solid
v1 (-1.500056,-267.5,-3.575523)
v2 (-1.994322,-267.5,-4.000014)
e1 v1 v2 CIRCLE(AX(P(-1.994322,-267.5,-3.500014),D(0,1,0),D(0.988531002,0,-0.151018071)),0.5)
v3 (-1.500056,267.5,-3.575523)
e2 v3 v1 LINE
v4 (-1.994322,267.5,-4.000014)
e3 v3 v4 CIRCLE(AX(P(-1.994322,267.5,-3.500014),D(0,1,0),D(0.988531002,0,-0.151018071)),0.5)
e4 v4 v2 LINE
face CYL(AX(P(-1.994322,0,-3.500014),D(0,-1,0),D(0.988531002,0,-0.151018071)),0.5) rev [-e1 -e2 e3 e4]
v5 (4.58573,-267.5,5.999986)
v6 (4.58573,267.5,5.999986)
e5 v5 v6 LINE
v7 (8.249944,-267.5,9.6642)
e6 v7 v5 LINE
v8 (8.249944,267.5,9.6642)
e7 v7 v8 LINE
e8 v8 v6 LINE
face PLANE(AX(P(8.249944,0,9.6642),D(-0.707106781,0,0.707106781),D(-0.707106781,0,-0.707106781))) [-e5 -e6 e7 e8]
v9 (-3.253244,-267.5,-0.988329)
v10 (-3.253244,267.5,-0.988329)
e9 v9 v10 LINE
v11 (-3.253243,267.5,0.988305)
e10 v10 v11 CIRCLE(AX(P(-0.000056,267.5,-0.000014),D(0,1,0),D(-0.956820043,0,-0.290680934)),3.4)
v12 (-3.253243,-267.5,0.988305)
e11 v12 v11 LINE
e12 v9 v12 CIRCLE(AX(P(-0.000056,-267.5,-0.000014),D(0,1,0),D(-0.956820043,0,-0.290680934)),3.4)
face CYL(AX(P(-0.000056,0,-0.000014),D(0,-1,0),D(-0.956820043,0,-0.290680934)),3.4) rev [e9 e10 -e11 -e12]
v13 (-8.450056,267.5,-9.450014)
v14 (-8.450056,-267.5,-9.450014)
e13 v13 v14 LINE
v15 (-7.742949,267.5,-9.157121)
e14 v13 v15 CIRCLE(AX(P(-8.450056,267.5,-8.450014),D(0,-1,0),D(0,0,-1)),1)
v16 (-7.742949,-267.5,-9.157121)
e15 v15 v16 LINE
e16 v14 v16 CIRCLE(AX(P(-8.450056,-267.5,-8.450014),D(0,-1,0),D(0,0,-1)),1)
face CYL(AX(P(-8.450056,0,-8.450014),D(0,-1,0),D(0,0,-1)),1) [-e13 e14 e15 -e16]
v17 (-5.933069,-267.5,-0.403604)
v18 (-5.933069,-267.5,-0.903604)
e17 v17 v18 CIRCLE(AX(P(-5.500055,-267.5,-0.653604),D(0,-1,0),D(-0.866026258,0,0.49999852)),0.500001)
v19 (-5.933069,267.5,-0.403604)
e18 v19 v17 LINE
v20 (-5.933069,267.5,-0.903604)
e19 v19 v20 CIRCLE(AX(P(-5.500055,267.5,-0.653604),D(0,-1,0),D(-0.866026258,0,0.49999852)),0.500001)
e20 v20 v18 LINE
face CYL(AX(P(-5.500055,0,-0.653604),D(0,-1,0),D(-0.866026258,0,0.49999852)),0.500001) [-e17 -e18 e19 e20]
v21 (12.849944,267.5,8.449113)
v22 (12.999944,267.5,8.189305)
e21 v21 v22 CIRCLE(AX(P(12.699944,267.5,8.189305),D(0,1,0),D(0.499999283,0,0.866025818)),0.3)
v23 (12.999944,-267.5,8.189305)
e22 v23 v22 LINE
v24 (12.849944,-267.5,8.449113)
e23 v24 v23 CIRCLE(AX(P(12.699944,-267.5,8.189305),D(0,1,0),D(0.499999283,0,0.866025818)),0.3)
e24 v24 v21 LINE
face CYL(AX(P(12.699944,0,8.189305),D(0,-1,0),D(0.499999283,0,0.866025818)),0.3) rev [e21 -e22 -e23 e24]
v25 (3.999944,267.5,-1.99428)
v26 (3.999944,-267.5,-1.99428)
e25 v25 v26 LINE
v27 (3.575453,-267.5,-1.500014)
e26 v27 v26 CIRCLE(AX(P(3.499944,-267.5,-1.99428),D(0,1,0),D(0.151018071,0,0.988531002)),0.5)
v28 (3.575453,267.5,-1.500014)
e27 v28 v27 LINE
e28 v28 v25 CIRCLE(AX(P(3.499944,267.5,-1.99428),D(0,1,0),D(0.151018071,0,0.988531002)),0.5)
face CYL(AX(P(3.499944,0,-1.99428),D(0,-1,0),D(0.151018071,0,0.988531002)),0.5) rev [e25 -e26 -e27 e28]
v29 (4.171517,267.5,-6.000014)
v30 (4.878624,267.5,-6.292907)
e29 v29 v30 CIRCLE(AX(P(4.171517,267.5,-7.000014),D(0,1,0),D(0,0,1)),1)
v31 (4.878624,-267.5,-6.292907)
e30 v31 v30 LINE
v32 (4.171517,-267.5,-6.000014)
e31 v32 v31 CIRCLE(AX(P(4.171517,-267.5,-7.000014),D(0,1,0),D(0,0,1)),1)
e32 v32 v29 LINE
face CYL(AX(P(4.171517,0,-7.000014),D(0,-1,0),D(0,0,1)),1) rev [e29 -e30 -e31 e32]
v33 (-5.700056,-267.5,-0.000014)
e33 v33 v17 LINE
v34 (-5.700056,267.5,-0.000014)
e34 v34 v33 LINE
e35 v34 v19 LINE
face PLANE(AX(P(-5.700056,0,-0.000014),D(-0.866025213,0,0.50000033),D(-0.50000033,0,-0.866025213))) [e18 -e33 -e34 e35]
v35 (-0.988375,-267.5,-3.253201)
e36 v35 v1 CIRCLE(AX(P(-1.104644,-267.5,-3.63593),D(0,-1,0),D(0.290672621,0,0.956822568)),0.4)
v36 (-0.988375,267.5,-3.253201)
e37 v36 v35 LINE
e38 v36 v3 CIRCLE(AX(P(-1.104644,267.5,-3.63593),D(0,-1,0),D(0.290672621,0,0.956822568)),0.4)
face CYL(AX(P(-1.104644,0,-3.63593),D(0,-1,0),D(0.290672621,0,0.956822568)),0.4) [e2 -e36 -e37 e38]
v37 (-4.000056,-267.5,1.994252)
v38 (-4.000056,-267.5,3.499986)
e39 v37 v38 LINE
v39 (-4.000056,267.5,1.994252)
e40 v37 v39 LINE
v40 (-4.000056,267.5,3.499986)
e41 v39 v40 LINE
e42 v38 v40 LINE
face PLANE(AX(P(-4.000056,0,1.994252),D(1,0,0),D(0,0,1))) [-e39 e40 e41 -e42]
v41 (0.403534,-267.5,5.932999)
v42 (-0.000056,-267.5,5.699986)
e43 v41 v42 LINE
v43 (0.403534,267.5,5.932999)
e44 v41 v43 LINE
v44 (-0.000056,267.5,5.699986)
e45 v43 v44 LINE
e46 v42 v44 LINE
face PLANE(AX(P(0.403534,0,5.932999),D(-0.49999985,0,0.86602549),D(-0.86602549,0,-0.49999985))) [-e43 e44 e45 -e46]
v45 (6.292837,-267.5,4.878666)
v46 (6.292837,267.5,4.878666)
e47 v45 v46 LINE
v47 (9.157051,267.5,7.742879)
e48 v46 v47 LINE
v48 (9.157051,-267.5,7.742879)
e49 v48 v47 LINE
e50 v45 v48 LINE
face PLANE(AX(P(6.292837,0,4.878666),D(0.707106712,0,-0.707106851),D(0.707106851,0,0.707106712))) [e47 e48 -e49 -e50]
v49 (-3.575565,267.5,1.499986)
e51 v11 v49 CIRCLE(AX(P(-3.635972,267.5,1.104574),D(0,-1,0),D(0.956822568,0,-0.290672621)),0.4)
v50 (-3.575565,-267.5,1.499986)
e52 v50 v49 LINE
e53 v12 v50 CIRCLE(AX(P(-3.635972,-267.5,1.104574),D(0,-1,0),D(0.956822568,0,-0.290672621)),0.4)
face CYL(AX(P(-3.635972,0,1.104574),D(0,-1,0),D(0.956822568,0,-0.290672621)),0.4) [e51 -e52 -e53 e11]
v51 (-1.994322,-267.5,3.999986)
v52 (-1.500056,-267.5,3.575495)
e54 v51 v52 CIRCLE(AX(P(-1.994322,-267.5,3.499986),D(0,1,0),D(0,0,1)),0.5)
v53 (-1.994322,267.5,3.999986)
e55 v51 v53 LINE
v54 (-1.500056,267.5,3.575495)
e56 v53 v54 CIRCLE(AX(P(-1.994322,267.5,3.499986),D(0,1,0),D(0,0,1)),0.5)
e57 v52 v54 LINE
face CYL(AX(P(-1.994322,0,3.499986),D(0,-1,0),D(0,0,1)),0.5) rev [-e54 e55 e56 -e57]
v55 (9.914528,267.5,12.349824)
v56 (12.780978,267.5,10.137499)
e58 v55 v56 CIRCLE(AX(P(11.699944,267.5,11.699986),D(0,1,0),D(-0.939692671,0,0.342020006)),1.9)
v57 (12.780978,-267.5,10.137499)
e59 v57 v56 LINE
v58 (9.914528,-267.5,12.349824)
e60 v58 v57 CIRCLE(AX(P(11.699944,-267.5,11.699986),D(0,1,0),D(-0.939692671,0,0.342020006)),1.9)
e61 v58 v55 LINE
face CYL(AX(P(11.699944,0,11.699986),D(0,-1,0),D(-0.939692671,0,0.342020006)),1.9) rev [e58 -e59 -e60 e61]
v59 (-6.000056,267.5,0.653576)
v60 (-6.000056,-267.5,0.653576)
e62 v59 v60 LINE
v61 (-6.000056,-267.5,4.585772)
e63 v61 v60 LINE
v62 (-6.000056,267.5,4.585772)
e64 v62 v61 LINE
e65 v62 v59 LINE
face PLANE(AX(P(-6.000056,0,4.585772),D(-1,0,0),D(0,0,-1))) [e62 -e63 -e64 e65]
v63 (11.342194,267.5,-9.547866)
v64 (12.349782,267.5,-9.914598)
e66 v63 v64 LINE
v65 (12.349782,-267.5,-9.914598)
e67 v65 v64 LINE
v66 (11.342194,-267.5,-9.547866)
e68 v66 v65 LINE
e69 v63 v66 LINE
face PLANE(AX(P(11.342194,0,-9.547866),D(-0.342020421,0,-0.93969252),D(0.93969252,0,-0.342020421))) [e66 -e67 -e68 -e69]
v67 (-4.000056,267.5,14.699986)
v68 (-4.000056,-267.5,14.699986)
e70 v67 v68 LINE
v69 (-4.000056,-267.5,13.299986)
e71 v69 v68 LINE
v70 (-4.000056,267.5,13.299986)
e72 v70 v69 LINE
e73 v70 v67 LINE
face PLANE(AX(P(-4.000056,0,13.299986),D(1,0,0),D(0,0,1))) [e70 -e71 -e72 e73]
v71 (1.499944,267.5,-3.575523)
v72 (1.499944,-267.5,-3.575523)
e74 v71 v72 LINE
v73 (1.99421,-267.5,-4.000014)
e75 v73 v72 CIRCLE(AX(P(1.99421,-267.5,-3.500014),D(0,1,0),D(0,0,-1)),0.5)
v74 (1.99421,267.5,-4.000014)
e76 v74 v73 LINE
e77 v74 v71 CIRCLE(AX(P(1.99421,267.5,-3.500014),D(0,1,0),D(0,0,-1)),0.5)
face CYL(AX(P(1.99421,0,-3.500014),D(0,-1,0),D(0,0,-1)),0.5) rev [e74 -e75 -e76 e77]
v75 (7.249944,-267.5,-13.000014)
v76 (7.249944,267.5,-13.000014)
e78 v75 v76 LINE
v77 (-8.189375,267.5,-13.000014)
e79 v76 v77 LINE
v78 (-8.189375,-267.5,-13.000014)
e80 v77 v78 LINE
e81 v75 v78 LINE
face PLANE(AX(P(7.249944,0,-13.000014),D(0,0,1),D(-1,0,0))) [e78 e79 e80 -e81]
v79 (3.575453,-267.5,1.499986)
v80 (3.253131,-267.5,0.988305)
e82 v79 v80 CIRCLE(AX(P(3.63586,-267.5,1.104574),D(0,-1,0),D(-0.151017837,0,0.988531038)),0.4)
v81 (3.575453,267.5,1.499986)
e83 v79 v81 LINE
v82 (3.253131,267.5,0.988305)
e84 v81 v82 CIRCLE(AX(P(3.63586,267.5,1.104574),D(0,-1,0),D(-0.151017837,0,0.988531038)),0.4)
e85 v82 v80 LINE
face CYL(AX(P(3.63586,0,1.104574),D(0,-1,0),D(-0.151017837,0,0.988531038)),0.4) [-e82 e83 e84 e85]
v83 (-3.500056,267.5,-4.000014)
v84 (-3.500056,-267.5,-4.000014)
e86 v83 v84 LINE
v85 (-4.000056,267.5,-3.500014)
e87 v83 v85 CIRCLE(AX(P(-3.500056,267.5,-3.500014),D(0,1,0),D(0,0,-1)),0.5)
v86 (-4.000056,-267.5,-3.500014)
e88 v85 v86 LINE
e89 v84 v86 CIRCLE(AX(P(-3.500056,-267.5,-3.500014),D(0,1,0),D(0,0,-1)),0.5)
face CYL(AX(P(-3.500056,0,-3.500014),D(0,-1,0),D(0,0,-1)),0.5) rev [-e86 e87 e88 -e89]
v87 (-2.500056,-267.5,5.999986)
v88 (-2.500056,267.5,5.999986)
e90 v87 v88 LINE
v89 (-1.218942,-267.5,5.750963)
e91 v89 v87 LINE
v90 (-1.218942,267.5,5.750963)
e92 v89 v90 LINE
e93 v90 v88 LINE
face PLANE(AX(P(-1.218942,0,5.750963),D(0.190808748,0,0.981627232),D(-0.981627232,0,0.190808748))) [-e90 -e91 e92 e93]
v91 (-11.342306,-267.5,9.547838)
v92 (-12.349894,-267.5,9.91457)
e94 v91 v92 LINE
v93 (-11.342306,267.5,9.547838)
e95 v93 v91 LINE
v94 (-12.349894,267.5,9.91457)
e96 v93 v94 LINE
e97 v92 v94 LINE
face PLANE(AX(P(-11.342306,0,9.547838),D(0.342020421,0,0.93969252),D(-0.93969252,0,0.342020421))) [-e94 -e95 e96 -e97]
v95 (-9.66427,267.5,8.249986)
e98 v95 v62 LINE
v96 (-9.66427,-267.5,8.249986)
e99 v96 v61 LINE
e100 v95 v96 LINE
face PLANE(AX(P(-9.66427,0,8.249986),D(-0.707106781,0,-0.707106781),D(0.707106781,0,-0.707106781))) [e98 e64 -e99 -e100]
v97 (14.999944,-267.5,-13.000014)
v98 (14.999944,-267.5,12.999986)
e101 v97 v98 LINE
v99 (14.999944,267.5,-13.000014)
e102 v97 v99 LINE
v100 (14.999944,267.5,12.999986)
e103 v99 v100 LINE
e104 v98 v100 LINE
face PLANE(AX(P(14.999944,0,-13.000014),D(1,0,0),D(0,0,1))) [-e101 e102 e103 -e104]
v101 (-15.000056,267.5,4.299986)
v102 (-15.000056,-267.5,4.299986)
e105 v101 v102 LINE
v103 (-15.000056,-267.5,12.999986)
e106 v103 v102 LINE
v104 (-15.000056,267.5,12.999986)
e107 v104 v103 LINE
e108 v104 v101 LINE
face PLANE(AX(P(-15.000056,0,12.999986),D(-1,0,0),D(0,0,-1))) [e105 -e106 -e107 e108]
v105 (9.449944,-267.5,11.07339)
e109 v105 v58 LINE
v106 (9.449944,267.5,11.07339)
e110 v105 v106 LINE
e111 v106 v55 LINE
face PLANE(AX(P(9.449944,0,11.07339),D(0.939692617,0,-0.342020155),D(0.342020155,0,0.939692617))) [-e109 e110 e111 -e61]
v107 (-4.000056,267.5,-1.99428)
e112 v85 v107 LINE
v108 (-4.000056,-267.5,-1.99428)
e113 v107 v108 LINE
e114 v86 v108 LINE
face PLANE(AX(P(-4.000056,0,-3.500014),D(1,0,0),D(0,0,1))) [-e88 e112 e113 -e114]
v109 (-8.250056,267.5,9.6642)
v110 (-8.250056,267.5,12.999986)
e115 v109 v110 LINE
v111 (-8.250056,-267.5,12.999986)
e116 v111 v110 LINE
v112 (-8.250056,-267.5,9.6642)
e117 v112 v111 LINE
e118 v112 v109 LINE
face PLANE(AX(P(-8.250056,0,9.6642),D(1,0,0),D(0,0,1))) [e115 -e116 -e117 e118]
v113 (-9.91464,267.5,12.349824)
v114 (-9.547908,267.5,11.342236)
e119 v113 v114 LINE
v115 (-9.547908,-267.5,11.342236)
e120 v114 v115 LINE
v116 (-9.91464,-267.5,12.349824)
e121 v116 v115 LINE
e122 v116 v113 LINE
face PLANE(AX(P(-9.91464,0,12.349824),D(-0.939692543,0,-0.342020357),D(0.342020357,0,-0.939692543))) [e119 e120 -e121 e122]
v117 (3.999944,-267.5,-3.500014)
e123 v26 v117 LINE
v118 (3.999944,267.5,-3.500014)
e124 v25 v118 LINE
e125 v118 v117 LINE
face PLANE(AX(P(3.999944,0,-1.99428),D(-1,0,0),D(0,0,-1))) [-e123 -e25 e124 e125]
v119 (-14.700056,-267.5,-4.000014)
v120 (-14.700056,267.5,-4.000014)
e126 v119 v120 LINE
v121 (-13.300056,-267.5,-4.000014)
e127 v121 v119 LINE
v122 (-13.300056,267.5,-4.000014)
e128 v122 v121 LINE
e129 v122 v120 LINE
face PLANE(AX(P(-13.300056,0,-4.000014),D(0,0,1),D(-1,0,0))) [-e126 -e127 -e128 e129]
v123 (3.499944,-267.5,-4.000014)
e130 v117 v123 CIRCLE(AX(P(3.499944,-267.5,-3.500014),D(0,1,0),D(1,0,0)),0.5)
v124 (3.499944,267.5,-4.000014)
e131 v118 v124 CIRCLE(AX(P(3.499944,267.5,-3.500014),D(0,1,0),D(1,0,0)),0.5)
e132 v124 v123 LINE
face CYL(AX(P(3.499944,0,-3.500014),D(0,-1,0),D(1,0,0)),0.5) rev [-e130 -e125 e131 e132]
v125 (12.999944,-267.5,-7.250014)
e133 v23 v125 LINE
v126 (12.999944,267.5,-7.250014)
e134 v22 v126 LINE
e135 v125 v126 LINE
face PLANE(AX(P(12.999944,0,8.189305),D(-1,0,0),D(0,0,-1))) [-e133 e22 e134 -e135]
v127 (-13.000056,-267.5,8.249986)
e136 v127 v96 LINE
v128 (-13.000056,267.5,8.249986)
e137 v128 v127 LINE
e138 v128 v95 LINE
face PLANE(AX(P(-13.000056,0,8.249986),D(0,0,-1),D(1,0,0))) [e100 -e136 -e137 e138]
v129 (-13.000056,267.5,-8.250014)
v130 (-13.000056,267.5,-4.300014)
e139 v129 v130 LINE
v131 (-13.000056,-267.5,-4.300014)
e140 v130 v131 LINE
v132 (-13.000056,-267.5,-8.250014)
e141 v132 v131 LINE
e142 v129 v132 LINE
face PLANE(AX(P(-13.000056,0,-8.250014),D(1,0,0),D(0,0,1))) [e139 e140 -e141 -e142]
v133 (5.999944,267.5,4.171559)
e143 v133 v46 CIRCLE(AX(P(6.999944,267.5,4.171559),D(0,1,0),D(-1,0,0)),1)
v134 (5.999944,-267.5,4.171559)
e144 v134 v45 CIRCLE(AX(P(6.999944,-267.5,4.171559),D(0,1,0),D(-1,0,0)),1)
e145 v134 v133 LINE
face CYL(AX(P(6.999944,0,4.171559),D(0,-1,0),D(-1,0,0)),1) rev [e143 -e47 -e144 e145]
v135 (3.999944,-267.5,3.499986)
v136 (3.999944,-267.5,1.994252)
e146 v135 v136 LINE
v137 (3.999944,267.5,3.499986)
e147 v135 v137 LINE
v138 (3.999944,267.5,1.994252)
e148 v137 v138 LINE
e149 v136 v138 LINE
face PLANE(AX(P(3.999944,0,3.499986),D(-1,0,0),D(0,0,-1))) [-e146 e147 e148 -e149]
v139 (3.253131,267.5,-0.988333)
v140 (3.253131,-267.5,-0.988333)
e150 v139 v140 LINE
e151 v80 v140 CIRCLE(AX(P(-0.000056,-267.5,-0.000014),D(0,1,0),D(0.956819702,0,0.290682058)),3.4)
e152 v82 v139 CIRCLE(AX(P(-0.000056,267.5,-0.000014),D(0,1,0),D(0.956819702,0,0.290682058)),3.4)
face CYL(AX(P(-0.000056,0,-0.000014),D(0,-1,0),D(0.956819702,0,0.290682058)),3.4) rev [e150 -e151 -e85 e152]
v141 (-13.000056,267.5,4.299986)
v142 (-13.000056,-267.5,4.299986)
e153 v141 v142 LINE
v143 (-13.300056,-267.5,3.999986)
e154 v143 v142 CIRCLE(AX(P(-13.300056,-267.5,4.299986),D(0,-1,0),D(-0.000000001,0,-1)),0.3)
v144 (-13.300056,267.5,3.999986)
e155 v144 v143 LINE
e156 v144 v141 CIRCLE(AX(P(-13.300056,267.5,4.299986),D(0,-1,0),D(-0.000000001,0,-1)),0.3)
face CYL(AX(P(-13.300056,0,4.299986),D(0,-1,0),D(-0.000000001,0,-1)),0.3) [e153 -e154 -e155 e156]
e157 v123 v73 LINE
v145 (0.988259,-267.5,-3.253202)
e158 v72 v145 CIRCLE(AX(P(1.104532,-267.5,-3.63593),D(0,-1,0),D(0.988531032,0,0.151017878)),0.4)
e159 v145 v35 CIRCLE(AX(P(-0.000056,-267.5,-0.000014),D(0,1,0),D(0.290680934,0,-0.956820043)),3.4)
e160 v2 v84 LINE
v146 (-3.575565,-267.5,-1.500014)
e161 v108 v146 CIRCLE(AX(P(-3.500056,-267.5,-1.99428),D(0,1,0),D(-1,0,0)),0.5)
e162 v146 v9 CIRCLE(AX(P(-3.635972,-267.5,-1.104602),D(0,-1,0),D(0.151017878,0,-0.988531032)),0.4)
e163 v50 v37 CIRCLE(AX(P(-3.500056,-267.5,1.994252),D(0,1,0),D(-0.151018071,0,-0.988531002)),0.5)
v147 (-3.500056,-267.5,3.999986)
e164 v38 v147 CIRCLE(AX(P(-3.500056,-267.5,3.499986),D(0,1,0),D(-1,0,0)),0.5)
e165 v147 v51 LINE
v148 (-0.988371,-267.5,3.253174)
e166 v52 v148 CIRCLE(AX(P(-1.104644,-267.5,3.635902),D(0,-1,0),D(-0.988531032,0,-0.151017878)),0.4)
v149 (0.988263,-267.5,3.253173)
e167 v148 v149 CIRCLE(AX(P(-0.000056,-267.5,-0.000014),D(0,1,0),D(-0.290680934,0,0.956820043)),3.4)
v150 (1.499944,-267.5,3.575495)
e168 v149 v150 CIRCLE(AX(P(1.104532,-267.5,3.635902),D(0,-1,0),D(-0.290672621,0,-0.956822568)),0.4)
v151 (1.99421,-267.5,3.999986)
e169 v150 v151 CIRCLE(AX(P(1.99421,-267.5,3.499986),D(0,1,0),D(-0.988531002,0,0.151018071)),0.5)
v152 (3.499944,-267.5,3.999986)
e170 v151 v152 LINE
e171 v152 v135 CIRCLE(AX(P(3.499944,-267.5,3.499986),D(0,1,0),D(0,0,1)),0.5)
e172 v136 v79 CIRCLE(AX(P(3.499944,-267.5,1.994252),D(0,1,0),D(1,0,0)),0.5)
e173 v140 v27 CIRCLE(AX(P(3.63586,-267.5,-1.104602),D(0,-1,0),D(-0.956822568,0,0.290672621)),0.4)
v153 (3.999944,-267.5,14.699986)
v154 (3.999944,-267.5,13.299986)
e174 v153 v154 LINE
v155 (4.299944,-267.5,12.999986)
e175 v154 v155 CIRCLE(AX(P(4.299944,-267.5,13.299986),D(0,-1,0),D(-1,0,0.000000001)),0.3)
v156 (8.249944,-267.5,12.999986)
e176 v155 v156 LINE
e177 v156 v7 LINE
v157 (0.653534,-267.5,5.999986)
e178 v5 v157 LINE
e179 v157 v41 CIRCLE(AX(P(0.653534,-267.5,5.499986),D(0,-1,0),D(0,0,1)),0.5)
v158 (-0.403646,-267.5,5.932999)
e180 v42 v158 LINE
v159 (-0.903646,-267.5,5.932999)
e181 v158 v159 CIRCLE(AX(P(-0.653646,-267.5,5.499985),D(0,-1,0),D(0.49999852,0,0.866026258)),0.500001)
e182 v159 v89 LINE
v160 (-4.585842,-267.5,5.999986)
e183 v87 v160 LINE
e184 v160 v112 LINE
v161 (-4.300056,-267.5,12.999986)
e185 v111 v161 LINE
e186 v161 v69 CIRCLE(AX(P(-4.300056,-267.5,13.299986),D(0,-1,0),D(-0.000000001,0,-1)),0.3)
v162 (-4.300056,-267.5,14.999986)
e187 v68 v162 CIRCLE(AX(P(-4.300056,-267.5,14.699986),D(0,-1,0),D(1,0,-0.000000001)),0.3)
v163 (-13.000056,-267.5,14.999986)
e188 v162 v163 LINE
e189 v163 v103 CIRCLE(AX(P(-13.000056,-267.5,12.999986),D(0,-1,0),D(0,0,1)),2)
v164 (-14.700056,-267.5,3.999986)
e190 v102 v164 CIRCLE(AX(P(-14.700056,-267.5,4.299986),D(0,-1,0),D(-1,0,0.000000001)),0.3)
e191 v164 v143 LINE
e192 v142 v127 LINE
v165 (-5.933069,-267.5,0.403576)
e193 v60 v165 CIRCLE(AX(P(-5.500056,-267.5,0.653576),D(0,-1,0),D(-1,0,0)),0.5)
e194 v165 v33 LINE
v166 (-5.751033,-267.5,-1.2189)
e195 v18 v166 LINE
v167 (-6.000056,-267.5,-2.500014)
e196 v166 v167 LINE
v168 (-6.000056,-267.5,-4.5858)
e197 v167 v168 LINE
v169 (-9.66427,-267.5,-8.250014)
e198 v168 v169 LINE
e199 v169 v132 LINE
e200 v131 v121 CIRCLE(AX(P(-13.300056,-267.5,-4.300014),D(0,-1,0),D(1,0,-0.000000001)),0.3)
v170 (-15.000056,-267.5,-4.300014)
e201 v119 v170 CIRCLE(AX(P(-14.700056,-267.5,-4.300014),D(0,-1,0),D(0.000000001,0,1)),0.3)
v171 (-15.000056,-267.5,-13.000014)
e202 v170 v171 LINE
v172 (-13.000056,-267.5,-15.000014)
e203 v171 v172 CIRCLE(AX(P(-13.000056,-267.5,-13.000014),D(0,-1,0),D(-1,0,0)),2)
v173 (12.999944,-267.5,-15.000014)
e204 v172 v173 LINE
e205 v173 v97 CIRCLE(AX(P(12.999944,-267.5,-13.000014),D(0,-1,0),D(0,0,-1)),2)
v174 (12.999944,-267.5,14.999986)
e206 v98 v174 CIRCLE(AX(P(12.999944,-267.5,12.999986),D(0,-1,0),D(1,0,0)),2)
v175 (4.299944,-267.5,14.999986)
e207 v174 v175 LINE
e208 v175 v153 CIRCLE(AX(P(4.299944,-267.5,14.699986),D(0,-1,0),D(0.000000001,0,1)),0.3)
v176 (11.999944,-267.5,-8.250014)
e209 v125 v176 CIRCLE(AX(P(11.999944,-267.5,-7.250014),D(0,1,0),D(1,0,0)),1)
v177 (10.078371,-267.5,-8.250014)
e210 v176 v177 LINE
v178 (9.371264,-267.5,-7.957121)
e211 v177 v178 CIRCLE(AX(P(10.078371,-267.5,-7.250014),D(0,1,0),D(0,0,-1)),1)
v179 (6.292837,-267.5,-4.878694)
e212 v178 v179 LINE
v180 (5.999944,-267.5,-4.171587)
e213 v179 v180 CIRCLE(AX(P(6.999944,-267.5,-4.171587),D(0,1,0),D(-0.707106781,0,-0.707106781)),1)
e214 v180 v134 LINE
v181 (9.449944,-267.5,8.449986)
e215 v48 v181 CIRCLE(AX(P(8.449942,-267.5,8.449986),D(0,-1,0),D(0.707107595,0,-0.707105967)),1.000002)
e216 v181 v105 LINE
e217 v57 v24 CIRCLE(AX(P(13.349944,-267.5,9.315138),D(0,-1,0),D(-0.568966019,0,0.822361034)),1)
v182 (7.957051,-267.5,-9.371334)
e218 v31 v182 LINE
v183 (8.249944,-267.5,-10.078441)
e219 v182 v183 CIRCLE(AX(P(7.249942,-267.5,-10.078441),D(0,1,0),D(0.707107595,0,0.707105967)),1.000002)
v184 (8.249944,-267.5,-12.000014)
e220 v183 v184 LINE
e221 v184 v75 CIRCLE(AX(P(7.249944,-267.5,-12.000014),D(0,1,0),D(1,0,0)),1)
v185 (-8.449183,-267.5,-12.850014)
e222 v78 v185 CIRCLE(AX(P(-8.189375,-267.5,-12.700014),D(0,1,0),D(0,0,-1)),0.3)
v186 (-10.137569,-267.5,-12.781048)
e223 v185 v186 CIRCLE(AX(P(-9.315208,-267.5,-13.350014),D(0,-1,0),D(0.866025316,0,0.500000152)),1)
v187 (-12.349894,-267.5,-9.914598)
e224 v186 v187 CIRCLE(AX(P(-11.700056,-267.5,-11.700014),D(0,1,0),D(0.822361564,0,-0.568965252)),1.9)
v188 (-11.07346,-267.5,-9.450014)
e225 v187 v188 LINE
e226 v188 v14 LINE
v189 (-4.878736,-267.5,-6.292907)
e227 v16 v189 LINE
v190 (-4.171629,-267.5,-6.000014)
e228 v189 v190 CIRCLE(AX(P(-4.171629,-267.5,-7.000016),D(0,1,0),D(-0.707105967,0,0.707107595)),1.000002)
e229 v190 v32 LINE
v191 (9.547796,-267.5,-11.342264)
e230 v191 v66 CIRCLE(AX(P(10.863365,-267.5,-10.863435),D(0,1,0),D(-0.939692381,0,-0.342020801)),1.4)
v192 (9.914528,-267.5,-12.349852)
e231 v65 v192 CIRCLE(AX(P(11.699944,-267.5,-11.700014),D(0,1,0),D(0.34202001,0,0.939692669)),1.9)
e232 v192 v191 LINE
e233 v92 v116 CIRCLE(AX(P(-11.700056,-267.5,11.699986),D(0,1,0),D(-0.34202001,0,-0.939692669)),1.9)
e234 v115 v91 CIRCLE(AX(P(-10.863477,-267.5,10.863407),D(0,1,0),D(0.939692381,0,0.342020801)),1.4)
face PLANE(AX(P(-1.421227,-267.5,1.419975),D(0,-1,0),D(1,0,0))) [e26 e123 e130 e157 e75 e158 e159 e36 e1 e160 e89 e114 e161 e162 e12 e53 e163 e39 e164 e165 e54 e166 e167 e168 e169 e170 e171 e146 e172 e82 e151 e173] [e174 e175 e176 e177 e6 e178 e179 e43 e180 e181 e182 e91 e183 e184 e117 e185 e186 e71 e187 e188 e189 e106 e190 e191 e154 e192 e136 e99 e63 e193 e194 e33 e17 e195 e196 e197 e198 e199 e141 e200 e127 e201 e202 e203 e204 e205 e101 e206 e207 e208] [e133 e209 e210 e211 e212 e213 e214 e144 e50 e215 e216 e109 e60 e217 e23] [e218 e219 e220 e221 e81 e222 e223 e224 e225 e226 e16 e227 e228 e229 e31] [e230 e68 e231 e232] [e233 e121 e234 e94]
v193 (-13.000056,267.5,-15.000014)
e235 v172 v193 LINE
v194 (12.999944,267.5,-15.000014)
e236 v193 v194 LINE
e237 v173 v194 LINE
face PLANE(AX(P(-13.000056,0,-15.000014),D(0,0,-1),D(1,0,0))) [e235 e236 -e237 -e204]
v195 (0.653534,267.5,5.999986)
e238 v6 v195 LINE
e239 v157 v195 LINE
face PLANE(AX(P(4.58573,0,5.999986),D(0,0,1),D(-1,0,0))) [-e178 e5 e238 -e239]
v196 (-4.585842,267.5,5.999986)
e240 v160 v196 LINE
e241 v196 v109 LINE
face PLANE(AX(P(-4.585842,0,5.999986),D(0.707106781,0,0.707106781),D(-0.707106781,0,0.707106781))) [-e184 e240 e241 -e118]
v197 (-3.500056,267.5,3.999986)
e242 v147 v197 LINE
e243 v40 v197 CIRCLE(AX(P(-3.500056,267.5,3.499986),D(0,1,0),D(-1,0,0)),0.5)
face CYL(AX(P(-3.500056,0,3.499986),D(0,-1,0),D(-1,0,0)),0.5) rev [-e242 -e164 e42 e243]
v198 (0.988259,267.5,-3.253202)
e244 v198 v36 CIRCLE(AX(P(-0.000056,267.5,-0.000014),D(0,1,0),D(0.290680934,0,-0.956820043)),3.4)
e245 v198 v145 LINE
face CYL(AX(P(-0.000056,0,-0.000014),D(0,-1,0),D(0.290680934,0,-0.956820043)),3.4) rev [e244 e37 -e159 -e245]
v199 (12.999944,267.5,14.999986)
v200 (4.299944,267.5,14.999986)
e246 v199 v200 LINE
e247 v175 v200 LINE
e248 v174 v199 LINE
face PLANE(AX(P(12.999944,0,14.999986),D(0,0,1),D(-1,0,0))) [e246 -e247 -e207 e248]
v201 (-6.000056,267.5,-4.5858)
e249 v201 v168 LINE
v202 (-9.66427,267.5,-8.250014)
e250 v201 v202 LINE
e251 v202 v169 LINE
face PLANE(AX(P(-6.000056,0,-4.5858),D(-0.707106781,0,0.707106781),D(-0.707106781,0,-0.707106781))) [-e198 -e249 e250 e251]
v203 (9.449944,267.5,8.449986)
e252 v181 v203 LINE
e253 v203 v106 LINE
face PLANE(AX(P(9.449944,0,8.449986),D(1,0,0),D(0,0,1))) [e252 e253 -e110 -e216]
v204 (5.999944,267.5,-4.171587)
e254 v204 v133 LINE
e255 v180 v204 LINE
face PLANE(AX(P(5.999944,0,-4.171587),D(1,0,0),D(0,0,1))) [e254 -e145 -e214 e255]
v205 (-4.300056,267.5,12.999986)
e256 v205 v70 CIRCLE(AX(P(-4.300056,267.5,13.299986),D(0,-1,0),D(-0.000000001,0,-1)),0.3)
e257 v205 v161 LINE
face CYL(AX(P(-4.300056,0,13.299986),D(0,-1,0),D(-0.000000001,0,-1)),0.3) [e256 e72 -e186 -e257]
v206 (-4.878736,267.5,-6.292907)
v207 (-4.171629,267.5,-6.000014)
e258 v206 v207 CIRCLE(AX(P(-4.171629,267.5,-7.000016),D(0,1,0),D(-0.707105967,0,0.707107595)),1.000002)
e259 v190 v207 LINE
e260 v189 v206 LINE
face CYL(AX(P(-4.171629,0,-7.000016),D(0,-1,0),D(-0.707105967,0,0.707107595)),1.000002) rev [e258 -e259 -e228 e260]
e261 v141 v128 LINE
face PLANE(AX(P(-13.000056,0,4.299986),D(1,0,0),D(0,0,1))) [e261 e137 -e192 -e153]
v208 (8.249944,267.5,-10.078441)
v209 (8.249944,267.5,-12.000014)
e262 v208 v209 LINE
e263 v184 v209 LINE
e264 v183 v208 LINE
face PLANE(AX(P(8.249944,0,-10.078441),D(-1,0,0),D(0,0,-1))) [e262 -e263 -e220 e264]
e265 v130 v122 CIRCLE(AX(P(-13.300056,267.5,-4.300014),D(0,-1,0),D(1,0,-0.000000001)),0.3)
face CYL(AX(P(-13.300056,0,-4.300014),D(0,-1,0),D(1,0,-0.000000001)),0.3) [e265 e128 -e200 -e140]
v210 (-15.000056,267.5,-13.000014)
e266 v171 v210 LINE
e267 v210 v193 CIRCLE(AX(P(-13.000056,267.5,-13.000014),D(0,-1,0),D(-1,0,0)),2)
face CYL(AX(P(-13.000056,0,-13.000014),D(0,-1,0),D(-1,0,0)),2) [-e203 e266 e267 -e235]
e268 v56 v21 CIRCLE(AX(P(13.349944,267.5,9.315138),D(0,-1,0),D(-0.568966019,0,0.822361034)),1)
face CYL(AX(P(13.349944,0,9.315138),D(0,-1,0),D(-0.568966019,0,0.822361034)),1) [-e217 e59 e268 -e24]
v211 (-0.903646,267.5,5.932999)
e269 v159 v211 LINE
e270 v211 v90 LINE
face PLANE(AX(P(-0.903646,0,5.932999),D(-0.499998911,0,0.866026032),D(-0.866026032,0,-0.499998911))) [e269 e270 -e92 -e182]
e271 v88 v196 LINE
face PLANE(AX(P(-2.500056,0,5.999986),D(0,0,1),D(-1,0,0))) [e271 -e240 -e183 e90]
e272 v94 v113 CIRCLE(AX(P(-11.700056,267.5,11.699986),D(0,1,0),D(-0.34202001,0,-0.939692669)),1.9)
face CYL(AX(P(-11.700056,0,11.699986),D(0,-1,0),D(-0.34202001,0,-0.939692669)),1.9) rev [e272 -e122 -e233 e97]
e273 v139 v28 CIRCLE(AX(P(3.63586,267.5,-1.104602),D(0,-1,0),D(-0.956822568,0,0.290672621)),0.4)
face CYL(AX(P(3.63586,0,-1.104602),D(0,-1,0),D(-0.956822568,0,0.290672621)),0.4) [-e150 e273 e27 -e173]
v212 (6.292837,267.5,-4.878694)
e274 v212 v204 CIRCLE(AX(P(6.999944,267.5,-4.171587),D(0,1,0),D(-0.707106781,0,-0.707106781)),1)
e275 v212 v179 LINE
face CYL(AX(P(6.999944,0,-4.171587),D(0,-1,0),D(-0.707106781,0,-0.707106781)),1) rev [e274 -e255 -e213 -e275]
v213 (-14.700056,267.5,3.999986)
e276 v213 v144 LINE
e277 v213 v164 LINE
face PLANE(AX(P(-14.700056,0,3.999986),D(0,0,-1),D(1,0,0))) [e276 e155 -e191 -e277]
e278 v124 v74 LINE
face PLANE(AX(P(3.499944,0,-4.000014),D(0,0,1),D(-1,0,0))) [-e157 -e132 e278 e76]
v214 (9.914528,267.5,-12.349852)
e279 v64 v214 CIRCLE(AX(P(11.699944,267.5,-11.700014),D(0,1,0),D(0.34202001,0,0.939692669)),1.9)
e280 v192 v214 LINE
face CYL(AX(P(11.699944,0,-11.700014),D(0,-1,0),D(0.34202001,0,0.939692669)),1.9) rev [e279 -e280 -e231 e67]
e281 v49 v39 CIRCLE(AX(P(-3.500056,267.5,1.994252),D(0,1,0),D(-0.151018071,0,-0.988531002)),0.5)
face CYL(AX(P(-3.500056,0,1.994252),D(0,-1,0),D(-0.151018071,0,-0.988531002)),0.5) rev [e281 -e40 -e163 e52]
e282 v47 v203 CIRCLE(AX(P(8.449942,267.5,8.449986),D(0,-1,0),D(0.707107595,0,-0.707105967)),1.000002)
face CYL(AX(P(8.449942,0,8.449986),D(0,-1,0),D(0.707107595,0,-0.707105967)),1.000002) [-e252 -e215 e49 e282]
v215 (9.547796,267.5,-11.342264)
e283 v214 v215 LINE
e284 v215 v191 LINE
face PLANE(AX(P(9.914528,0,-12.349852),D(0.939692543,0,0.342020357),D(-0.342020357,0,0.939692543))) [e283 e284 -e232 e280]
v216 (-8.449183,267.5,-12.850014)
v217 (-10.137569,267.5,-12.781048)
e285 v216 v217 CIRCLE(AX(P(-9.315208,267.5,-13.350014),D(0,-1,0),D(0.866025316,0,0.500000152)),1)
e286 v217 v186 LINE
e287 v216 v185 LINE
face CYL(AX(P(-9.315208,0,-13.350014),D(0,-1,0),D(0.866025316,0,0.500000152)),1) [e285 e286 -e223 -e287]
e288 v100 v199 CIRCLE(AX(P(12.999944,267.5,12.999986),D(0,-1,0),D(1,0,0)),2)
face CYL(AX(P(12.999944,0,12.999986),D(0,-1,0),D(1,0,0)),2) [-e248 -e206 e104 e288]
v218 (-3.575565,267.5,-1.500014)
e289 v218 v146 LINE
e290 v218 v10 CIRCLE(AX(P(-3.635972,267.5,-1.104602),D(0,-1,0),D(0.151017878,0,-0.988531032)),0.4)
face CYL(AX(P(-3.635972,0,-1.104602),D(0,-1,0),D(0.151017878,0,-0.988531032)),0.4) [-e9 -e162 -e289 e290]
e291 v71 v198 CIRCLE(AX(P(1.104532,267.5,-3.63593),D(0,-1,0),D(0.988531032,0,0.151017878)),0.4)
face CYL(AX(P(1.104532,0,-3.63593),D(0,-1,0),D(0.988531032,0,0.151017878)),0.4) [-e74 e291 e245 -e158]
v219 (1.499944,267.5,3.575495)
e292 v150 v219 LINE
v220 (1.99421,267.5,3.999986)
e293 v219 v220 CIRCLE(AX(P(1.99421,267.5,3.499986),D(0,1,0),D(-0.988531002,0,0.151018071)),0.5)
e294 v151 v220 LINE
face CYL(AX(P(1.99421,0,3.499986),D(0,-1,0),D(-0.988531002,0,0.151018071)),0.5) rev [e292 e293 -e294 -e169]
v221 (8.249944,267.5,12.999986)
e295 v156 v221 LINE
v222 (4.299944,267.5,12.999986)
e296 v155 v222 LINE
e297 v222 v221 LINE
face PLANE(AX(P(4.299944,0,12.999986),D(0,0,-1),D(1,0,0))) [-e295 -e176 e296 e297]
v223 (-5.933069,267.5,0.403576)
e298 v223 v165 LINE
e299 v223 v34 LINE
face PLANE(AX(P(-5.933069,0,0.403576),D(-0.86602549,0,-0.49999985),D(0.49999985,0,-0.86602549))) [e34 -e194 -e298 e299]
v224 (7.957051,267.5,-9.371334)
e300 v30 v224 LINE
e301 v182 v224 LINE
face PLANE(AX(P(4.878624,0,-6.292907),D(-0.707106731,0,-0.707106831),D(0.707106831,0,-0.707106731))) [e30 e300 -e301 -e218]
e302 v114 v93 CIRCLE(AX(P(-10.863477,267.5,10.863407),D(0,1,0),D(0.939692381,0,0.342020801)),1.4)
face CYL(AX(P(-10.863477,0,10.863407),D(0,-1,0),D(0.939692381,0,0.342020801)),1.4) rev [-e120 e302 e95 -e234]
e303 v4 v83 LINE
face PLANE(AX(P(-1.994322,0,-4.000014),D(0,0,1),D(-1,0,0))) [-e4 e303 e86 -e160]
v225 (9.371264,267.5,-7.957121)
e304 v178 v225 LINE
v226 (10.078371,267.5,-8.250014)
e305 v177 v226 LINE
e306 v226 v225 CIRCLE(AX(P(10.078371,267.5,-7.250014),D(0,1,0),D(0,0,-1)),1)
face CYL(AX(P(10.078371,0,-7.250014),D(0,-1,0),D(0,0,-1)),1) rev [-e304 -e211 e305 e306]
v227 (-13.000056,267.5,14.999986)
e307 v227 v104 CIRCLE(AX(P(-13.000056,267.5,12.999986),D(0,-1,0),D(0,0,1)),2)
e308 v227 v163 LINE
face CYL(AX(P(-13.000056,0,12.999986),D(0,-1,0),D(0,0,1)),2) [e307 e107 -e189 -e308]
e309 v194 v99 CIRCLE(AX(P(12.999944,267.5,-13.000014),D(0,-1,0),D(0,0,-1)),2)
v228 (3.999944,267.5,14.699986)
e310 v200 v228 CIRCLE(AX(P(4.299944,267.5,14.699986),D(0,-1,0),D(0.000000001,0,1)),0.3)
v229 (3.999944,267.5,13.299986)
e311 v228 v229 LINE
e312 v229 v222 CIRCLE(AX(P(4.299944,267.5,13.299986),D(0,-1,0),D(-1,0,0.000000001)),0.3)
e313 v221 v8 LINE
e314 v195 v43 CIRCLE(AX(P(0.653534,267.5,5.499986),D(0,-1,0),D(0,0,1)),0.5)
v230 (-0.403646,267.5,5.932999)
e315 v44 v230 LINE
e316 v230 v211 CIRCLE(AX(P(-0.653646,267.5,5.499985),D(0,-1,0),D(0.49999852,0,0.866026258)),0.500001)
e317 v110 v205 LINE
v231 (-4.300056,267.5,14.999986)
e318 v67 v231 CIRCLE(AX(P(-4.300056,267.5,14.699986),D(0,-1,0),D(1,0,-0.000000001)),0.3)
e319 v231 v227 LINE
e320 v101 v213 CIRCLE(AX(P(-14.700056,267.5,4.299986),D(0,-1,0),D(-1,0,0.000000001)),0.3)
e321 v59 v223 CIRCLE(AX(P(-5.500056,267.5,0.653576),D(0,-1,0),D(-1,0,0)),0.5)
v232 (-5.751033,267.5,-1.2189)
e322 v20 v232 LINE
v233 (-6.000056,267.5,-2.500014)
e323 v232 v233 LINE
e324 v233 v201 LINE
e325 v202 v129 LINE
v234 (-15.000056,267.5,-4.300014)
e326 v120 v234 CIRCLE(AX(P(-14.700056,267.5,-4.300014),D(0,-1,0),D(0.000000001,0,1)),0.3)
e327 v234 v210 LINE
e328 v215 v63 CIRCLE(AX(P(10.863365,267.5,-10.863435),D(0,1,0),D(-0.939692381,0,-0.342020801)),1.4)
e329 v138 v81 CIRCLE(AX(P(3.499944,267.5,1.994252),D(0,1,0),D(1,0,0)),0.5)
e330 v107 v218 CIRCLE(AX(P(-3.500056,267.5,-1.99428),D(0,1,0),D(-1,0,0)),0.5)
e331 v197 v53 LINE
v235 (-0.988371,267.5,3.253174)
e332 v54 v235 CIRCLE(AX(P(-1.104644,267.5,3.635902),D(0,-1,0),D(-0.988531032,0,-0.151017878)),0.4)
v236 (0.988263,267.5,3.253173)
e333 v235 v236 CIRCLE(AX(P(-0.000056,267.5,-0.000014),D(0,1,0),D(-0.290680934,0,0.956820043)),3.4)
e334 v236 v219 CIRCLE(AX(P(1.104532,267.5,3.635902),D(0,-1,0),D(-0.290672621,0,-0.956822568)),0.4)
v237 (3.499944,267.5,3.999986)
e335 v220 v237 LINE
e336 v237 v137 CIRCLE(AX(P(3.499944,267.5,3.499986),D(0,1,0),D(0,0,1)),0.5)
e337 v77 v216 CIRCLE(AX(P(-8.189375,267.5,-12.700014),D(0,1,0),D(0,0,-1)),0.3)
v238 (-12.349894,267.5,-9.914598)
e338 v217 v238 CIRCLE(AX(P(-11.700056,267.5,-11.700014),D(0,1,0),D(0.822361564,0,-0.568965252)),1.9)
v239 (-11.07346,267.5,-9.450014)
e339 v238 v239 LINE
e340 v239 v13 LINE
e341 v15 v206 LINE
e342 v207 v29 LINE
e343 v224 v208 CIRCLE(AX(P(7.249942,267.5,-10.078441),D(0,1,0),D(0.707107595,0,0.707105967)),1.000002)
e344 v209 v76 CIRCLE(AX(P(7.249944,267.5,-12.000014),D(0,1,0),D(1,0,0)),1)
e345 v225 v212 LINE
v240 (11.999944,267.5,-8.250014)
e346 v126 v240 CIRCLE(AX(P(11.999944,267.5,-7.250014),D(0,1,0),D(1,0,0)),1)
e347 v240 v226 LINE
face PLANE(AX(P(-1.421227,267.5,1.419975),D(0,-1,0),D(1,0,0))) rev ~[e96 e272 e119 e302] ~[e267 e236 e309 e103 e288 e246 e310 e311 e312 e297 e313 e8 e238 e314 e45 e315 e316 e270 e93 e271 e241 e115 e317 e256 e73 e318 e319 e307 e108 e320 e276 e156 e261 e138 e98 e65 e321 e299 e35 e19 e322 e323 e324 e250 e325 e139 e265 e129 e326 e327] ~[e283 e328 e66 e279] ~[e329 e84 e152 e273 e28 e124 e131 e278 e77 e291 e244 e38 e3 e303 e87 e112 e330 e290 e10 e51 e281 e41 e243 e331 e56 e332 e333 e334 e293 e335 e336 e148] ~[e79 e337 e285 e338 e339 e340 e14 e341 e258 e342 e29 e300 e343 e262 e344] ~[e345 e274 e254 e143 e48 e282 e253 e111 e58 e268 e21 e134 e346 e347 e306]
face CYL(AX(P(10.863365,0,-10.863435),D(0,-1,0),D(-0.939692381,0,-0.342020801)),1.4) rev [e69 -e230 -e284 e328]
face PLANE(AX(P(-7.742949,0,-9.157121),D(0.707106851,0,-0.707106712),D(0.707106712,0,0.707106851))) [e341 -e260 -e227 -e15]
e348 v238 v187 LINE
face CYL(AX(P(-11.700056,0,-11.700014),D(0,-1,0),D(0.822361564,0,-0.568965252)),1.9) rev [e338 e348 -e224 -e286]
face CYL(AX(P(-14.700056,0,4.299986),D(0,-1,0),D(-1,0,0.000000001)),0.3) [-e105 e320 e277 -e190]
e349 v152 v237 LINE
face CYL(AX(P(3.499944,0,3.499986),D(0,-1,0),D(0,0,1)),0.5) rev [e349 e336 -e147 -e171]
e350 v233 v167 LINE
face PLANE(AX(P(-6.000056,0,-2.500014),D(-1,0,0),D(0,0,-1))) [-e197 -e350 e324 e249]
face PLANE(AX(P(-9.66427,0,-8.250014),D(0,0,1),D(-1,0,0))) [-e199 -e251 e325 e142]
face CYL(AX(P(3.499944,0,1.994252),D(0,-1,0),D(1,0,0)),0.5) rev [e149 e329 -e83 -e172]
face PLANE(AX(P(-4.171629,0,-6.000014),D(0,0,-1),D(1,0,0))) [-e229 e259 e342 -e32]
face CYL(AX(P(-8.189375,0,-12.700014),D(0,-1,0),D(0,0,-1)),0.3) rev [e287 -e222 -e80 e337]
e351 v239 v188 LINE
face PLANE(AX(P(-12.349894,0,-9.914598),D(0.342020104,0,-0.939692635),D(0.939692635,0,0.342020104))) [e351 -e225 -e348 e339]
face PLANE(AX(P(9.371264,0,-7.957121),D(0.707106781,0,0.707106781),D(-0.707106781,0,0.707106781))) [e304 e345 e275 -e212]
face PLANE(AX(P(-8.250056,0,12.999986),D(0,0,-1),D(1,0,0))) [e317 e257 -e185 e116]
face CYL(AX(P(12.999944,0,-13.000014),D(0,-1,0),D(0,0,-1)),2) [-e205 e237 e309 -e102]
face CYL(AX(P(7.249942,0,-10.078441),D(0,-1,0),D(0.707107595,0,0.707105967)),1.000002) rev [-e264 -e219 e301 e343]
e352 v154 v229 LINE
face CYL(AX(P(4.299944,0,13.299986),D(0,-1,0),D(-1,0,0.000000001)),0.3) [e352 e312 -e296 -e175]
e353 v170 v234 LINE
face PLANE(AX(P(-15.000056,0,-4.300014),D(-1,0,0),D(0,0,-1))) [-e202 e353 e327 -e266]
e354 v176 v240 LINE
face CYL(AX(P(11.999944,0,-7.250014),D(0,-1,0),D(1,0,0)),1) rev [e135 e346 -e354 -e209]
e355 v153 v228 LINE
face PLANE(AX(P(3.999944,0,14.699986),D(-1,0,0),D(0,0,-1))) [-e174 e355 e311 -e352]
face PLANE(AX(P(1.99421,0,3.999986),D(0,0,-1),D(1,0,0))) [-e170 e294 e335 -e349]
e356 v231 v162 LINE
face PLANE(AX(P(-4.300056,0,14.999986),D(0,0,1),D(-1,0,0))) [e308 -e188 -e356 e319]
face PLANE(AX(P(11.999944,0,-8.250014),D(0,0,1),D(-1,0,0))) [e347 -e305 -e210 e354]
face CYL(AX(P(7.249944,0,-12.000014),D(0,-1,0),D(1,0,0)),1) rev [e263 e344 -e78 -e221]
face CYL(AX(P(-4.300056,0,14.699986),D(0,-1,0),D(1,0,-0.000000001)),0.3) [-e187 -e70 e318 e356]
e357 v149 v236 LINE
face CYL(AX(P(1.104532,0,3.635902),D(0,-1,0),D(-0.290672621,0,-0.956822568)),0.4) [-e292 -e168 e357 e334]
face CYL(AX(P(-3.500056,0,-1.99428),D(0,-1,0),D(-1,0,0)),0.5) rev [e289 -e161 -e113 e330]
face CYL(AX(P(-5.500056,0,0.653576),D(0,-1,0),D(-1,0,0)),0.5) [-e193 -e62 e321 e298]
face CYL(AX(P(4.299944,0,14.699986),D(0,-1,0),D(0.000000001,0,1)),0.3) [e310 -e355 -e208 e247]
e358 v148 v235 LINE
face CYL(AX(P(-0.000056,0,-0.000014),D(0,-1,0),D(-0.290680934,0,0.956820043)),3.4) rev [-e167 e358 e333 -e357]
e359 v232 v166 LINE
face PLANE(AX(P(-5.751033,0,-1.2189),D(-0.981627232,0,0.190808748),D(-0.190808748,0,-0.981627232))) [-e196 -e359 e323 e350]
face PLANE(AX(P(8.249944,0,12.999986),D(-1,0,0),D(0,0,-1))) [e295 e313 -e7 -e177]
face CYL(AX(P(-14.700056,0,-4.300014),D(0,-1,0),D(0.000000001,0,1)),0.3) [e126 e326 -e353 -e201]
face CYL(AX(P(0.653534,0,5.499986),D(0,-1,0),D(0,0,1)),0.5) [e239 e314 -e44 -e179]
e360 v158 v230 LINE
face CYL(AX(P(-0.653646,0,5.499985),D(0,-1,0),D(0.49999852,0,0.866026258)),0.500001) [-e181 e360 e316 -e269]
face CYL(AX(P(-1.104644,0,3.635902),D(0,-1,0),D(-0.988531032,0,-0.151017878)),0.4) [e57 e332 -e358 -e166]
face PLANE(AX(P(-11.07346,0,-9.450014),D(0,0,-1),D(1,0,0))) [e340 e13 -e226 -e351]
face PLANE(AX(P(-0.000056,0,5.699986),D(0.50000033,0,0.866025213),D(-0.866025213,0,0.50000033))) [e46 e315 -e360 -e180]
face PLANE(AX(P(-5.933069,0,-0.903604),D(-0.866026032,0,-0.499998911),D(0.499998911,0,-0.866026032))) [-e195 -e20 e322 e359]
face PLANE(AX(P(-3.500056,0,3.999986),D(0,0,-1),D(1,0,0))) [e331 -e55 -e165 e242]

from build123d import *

# Parameters (mm, degrees)
F2_DEPTH = 267.5


# Not quite as in the source:
# - ends of sketch curves that miss each other by under 0.0002 mm in the source are joined


with BuildPart() as f2:
    # F1 (on Front) → F2 (new body, symmetric)
    with BuildSketch(Plane.XZ):
        with BuildLine():
            Line((-8.250056, 12.999986), (-4.300056, 12.999986))
            ThreePointArc((-4.300056, 12.999986), (-4.0879239656, 13.0878539656), (-4.000056, 13.299986))
            Line((-4.000056, 13.299986), (-4.000056, 14.699986))
            ThreePointArc((-4.000056, 14.699986), (-4.0879239656, 14.9121180344), (-4.300056, 14.999986))
            Line((-4.300056, 14.999986), (-13.000056, 14.999986))
            ThreePointArc((-13.000056, 14.999986), (-14.4142695624, 14.4141995624), (-15.000056, 12.999986))
            Line((-15.000056, 12.999986), (-15.000056, 4.299986))
            ThreePointArc((-15.000056, 4.299986), (-14.9121880344, 4.0878539656), (-14.700056, 3.999986))
            Line((-14.700056, 3.999986), (-13.300056, 3.999986))
            ThreePointArc((-13.300056, 3.999986), (-13.0879239656, 4.0878539656), (-13.000056, 4.299986))
            Line((-13.000056, 4.299986), (-13.000056, 8.249986))
            Line((-13.000056, 8.249986), (-9.66427, 8.249986))
            Line((-9.66427, 8.249986), (-6.000056, 4.585772))
            Line((-6.000056, 4.585772), (-6.000056, 0.653576))
            ThreePointArc((-6.000056, 0.653576), (-5.9830189324, 0.5241665494), (-5.9330687764, 0.4035761291))
            Line((-5.9330687764, 0.4035761291), (-5.700056, -1.4e-05))
            Line((-5.700056, -1.4e-05), (-5.933069, -0.403604))
            ThreePointArc((-5.933069, -0.403604), (-6.000056, -0.653604), (-5.9330687764, -0.9036038709))
            Line((-5.9330687764, -0.9036038709), (-5.751033, -1.2189))
            Line((-5.751033, -1.2189), (-6.000056, -2.500014))
            Line((-6.000056, -2.500014), (-6.000056, -4.5858))
            Line((-6.000056, -4.5858), (-9.66427, -8.250014))
            Line((-9.66427, -8.250014), (-13.000056, -8.250014))
            Line((-13.000056, -8.250014), (-13.000056, -4.300014))
            ThreePointArc((-13.000056, -4.300014), (-13.0879239656, -4.0878819656), (-13.300056, -4.000014))
            Line((-13.300056, -4.000014), (-14.700056, -4.000014))
            ThreePointArc((-14.700056, -4.000014), (-14.9121880344, -4.0878819656), (-15.000056, -4.300014))
            Line((-15.000056, -4.300014), (-15.000056, -13.000014))
            ThreePointArc((-15.000056, -13.000014), (-14.4142695624, -14.4142275624), (-13.000056, -15.000014))
            Line((-13.000056, -15.000014), (12.999944, -15.000014))
            ThreePointArc((12.999944, -15.000014), (14.4141575624, -14.4142275624), (14.999944, -13.000014))
            Line((14.999944, -13.000014), (14.999944, 12.999986))
            ThreePointArc((14.999944, 12.999986), (14.4141575624, 14.4141995624), (12.999944, 14.999986))
            Line((12.999944, 14.999986), (4.299944, 14.999986))
            ThreePointArc((4.299944, 14.999986), (4.0878119656, 14.9121180344), (3.999944, 14.699986))
            Line((3.999944, 14.699986), (3.999944, 13.299986))
            ThreePointArc((3.999944, 13.299986), (4.0878119656, 13.0878539656), (4.299944, 12.999986))
            Line((4.299944, 12.999986), (8.249944, 12.999986))
            Line((8.249944, 12.999986), (8.249944, 9.6642))
            Line((8.249944, 9.6642), (4.58573, 5.999986))
            Line((4.58573, 5.999986), (0.653534, 5.999986))
            ThreePointArc((0.653534, 5.999986), (0.5241245494, 5.9829489324), (0.4035341291, 5.9329987764))
            Line((0.4035341291, 5.9329987764), (-5.6e-05, 5.699986))
            Line((-5.6e-05, 5.699986), (-0.403646, 5.932999))
            ThreePointArc((-0.403646, 5.932999), (-0.653646, 5.999986), (-0.9036458709, 5.9329987764))
            Line((-0.9036458709, 5.9329987764), (-1.218942, 5.750963))
            Line((-1.218942, 5.750963), (-2.500056, 5.999986))
            Line((-2.500056, 5.999986), (-4.585842, 5.999986))
            Line((-4.585842, 5.999986), (-8.250056, 9.6642))
            Line((-8.250056, 9.6642), (-8.250056, 12.999986))
        make_face()
        with BuildLine():
            ThreePointArc((-8.189375, -13.000014), (-8.339375082, -12.9598215738), (-8.4491827159, -12.8500138359))
            ThreePointArc((-8.4491827159, -12.8500138359), (-9.2743948384, -12.3508472042), (-10.1375690315, -12.7810479782))
            ThreePointArc((-10.1375690315, -12.7810479782), (-13.2041723505, -12.8608903949), (-12.3498940253, -9.9145979306))
            Line((-12.3498940253, -9.9145979306), (-11.07346, -9.450014))
            Line((-11.07346, -9.450014), (-8.450056, -9.450014))
            ThreePointArc((-8.450056, -9.450014), (-8.0673725676, -9.3738935325), (-7.7429492188, -9.1571207812))
            Line((-7.7429492188, -9.1571207812), (-4.878736, -6.292907))
            ThreePointArc((-4.878736, -6.292907), (-4.5543124324, -6.0761344675), (-4.171629, -6.000014))
            Line((-4.171629, -6.000014), (4.171517, -6.000014))
            ThreePointArc((4.171517, -6.000014), (4.5542004324, -6.0761344675), (4.8786237812, -6.2929072188))
            Line((4.8786237812, -6.2929072188), (7.957051, -9.371334))
            ThreePointArc((7.957051, -9.371334), (8.1738235325, -9.6957575676), (8.249944, -10.078441))
            Line((8.249944, -10.078441), (8.249944, -12.000014))
            ThreePointArc((8.249944, -12.000014), (7.9570507812, -12.7071207812), (7.249944, -13.000014))
            Line((7.249944, -13.000014), (-8.189375, -13.000014))
        make_face(mode=Mode.SUBTRACT)
        with BuildLine():
            ThreePointArc((9.5477956661, -11.3422641215), (9.8734155063, -9.8734855063), (11.3421941215, -9.5478656661))
            Line((11.3421941215, -9.5478656661), (12.349782, -9.914598))
            ThreePointArc((12.349782, -9.914598), (13.0434468843, -13.0435168843), (9.9145279306, -12.3498520253))
            Line((9.9145279306, -12.3498520253), (9.5477956661, -11.3422641215))
        make_face(mode=Mode.SUBTRACT)
        with BuildLine():
            ThreePointArc((-9.5479076661, 11.3422361215), (-9.8735275063, 9.8734575063), (-11.3423061215, 9.5478376661))
            Line((-11.3423061215, 9.5478376661), (-12.349894, 9.91457))
            ThreePointArc((-12.349894, 9.91457), (-13.0435588843, 13.0434888843), (-9.9146399306, 12.3498240253))
            Line((-9.9146399306, 12.3498240253), (-9.5479076661, 11.3422361215))
        make_face(mode=Mode.SUBTRACT)
        with BuildLine():
            ThreePointArc((3.2531309855, 0.9883049956), (3.399944, -1.4e-05), (3.2531309855, -0.9883329956))
            ThreePointArc((3.2531309855, -0.9883329956), (3.2974111593, -1.3177976431), (3.5754529349, -1.5000144258))
            ThreePointArc((3.5754529349, -1.5000144258), (3.8792555231, -1.6685151025), (3.999944, -1.99428))
            Line((3.999944, -1.99428), (3.999944, -3.500014))
            ThreePointArc((3.999944, -3.500014), (3.8534973906, -3.8535673906), (3.499944, -4.000014))
            Line((3.499944, -4.000014), (1.99421, -4.000014))
            ThreePointArc((1.99421, -4.000014), (1.6684451025, -3.8793255231), (1.4999444822, -3.5755229263))
            ThreePointArc((1.4999444822, -3.5755229263), (1.3177276431, -3.2974811593), (0.9882590481, -3.2532021585))
            ThreePointArc((0.9882590481, -3.2532021585), (-5.6e-05, -3.400014), (-0.9883749956, -3.2532009855))
            ThreePointArc((-0.9883749956, -3.2532009855), (-1.3178396431, -3.2974811593), (-1.5000564258, -3.5755229349))
            ThreePointArc((-1.5000564258, -3.5755229349), (-1.6685571025, -3.8793255231), (-1.994322, -4.000014))
            Line((-1.994322, -4.000014), (-3.500056, -4.000014))
            ThreePointArc((-3.500056, -4.000014), (-3.8536093906, -3.8535673906), (-4.000056, -3.500014))
            Line((-4.000056, -3.500014), (-4.000056, -1.99428))
            ThreePointArc((-4.000056, -1.99428), (-3.8793675231, -1.6685151025), (-3.5755649263, -1.5000144822))
            ThreePointArc((-3.5755649263, -1.5000144822), (-3.2975231593, -1.3177976431), (-3.2532441585, -0.9883290481))
            ThreePointArc((-3.2532441585, -0.9883290481), (-3.400056, -1.4e-05), (-3.2532429855, 0.9883049956))
            ThreePointArc((-3.2532429855, 0.9883049956), (-3.2975231593, 1.3177696431), (-3.5755649349, 1.4999864258))
            ThreePointArc((-3.5755649349, 1.4999864258), (-3.8793675231, 1.6684871025), (-4.000056, 1.994252))
            Line((-4.000056, 1.994252), (-4.000056, 3.499986))
            ThreePointArc((-4.000056, 3.499986), (-3.8536093906, 3.8535393906), (-3.500056, 3.999986))
            Line((-3.500056, 3.999986), (-1.994322, 3.999986))
            ThreePointArc((-1.994322, 3.999986), (-1.6685571025, 3.8792975231), (-1.5000564822, 3.5754949263))
            ThreePointArc((-1.5000564822, 3.5754949263), (-1.3178396431, 3.2974531593), (-0.9883710481, 3.2531741585))
            ThreePointArc((-0.9883710481, 3.2531741585), (-5.6e-05, 3.399986), (0.9882629956, 3.2531729855))
            ThreePointArc((0.9882629956, 3.2531729855), (1.3177276431, 3.2974531593), (1.4999444258, 3.5754949349))
            ThreePointArc((1.4999444258, 3.5754949349), (1.6684451025, 3.8792975231), (1.99421, 3.999986))
            Line((1.99421, 3.999986), (3.499944, 3.999986))
            ThreePointArc((3.499944, 3.999986), (3.8534973906, 3.8535393906), (3.999944, 3.499986))
            Line((3.999944, 3.499986), (3.999944, 1.994252))
            ThreePointArc((3.999944, 1.994252), (3.8792555231, 1.6684871025), (3.5754529263, 1.4999864822))
            ThreePointArc((3.5754529263, 1.4999864822), (3.2974111593, 1.3177696431), (3.2531309855, 0.9883049956))
        make_face(mode=Mode.SUBTRACT)
        with BuildLine():
            ThreePointArc((6.2928372188, -4.8786937812), (6.0760644675, -4.5542704324), (5.999944, -4.171587))
            Line((5.999944, -4.171587), (5.999944, 4.171559))
            ThreePointArc((5.999944, 4.171559), (6.0760644675, 4.5542424324), (6.2928372188, 4.8786657812))
            Line((6.2928372188, 4.8786657812), (9.157051, 7.742879))
            ThreePointArc((9.157051, 7.742879), (9.3738235325, 8.0673025676), (9.449944, 8.449986))
            Line((9.449944, 8.449986), (9.449944, 11.07339))
            Line((9.449944, 11.07339), (9.914528, 12.349824))
            ThreePointArc((9.914528, 12.349824), (12.8608203949, 13.2041023505), (12.7809779799, 10.1374990291))
            ThreePointArc((12.7809779799, 10.1374990291), (12.3507772042, 9.2743248384), (12.8499438252, 8.4491126972))
            ThreePointArc((12.8499438252, 8.4491126972), (12.9597515738, 8.339305082), (12.999944, 8.189305))
            Line((12.999944, 8.189305), (12.999944, -7.250014))
            ThreePointArc((12.999944, -7.250014), (12.7070507812, -7.9571207812), (11.999944, -8.250014))
            Line((11.999944, -8.250014), (10.078371, -8.250014))
            ThreePointArc((10.078371, -8.250014), (9.6956875676, -8.1738935325), (9.3712642188, -7.9571207812))
            Line((9.3712642188, -7.9571207812), (6.2928372188, -4.8786937812))
        make_face(mode=Mode.SUBTRACT)
    extrude(amount=F2_DEPTH, both=True)


solid = f2.part
